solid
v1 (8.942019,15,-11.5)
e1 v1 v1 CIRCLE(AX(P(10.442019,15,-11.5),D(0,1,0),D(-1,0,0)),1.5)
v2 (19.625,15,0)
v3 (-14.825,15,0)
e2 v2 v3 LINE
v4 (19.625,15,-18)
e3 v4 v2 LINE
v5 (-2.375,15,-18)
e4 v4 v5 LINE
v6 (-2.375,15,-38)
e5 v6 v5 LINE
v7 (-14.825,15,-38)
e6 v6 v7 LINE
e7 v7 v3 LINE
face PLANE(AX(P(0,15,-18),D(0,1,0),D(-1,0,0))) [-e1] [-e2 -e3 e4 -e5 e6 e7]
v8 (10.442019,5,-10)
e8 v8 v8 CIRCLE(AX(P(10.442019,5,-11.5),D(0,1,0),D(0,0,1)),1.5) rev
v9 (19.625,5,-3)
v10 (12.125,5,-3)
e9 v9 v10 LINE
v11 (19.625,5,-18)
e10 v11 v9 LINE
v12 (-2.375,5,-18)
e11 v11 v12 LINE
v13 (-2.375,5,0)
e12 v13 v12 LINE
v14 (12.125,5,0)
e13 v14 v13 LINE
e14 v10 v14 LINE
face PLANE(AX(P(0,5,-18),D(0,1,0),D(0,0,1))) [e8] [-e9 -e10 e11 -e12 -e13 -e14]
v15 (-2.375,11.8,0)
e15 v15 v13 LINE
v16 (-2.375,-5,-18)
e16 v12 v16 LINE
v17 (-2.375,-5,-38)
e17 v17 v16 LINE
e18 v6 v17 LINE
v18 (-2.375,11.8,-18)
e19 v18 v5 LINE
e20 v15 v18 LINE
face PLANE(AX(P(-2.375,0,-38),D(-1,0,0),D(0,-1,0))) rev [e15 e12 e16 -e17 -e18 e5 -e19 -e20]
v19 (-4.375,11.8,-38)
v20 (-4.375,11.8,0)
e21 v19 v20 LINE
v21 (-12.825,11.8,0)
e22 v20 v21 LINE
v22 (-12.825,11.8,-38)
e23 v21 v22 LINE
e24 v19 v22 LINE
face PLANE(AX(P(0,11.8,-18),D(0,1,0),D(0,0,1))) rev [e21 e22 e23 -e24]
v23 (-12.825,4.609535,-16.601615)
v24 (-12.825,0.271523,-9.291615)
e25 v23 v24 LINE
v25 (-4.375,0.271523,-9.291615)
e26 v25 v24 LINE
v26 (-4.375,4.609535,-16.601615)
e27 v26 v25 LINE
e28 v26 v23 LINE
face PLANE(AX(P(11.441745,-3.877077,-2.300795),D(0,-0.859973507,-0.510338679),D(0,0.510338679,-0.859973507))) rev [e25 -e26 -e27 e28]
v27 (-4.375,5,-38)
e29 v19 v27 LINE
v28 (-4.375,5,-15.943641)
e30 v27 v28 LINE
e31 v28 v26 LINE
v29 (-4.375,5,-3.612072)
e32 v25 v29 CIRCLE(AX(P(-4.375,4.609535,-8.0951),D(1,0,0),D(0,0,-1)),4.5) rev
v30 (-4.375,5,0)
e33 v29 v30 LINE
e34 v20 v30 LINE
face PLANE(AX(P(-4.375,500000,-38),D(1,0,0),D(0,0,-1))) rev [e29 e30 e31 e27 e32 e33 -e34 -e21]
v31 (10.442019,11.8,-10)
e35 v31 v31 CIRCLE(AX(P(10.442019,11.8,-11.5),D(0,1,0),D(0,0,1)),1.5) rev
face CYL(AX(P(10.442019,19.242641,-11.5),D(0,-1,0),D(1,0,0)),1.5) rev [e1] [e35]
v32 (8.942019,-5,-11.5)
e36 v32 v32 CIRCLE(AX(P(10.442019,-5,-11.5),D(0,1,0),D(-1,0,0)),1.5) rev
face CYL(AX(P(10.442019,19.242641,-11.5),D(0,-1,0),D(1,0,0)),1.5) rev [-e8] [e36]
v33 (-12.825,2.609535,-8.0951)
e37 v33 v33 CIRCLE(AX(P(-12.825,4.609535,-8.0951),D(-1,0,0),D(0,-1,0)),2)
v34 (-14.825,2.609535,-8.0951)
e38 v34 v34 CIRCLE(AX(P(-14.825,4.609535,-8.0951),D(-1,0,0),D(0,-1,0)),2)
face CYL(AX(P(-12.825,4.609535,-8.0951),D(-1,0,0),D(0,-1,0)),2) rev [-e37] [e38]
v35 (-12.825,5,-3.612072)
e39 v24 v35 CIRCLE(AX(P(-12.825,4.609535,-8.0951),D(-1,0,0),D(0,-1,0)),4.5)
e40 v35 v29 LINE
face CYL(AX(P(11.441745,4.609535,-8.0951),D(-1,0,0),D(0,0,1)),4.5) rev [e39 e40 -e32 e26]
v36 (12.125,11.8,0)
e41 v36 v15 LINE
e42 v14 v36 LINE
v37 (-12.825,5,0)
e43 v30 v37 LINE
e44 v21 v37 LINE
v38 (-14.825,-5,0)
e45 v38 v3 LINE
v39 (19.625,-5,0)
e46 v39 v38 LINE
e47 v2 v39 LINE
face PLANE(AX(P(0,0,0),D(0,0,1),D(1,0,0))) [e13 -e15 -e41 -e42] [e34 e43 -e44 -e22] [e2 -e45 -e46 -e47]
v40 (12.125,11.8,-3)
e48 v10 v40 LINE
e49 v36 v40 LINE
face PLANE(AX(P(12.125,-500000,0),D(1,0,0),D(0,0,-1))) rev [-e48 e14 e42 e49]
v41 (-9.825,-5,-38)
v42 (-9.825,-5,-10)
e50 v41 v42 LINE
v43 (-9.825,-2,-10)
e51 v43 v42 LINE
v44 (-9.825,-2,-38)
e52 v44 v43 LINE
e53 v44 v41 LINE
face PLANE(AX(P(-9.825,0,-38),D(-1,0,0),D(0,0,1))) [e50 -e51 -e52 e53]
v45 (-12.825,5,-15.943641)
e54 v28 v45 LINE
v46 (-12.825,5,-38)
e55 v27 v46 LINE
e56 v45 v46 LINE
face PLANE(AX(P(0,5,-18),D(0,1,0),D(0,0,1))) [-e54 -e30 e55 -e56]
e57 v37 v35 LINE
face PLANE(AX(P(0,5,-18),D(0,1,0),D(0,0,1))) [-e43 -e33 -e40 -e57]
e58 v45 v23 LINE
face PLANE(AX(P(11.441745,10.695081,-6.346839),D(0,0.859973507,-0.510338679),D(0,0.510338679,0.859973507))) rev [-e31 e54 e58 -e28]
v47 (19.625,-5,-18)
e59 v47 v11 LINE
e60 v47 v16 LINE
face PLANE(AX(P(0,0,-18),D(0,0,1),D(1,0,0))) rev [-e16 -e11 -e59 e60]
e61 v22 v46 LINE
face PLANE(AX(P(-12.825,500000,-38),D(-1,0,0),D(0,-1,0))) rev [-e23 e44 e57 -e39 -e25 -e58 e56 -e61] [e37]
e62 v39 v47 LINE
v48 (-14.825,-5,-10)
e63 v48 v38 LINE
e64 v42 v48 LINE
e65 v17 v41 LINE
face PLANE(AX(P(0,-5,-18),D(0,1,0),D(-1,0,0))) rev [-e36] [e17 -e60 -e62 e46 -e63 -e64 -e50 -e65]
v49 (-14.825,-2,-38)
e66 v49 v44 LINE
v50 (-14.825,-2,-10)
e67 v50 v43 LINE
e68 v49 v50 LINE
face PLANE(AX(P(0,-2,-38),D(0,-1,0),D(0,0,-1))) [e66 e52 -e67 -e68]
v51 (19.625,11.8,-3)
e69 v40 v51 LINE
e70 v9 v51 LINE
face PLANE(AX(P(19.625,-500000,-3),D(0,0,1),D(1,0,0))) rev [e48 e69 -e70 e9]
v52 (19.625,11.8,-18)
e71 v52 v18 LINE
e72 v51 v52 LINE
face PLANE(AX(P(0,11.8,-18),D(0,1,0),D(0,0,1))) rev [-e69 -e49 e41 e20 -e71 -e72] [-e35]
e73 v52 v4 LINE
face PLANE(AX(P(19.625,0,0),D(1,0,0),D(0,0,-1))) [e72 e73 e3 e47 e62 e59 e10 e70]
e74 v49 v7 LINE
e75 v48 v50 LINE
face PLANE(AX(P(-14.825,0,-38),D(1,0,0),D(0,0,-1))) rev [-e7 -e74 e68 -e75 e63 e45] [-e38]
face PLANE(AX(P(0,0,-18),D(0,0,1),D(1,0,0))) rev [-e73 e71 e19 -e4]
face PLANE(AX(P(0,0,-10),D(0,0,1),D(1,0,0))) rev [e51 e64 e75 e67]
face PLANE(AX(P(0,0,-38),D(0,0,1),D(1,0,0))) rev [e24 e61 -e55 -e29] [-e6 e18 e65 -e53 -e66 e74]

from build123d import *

# Parameters (mm, degrees)
SKETCH1_W             = 19
SKETCH1_H             = 10
BOSS_EXTRUDE1_DEPTH   = 18
SKETCH1_H_2           = 3.2
BOSS_EXTRUDE1_2_DEPTH = 18
SKETCH1_6_W           = 12.45
SKETCH1_6_H           = 3.2
BOSS_EXTRUDE6_DEPTH   = 38
BOSS_EXTRUDE7_DEPTH   = 10
SKETCH4_W             = 18
SKETCH4_H             = 10
SKETCH4_H_2           = 3.2
BOSS_EXTRUDE8_DEPTH   = 3
CUT_EXTRUDE1_START    = -10
SKETCH6_R             = 1.5
CUT_EXTRUDE1_DEPTH    = 20
BOSS_EXTRUDE10_REACH  = 45.922
SKETCH7_W             = 2
SKETCH7_H             = 38
BOSS_EXTRUDE11_REACH  = 47.95
SKETCH8_W             = 7.5
SKETCH8_H             = 3
SKETCH9_R             = 2
CUT_EXTRUDE2_DEPTH    = 2
CUT_EXTRUDE3_START    = -10.45
CUT_EXTRUDE3_DEPTH    = 8.45


# Read off the part's stored shape, not the designer's step: Cut-Extrude3
with BuildPart() as part:
    # Sketch1 → Boss-Extrude1 (new body)
    with BuildSketch(Plane.XY):
        with Locations((7.125, 0)):
            Rectangle(SKETCH1_W, SKETCH1_H)
    extrude(amount=-BOSS_EXTRUDE1_DEPTH)



with BuildPart() as body_2:
    # Sketch1 → Boss-Extrude1 2 (new body)
    with BuildSketch(Plane.XY):
        with Locations((7.125, 13.4)):
            Rectangle(SKETCH1_W, SKETCH1_H_2)
    extrude(amount=-BOSS_EXTRUDE1_2_DEPTH)


with BuildPart() as part_1:
    add(part.part)

    add(body_2.part)  # Boss-Extrude6 merges body 2
    # Sketch1<6> → Boss-Extrude6 (add)
    with BuildSketch(Plane.XY):
        Polygon((-14.825, 5), (-14.825, -2), (-9.825, -2), (-9.825, -5), (-2.375, -5), (-2.375, 5), align=None)
        with Locations((-8.6, 13.4)):
            Rectangle(SKETCH1_6_W, SKETCH1_6_H)
    extrude(amount=-BOSS_EXTRUDE6_DEPTH)

    # Sketch1<7> → Boss-Extrude7 (add)
    with BuildSketch(Plane.XY):
        Polygon((-14.825, -2), (-14.825, -3.3), (-14.825, -5), (-9.825, -5), (-9.825, -2), align=None)
    extrude(amount=-BOSS_EXTRUDE7_DEPTH)

    # Sketch4 → Boss-Extrude8 (add)
    with BuildSketch(Plane(origin=(16.625, 0, 0), x_dir=(0, 0, -1), z_dir=(1, 0, 0))):
        with Locations((9, 0)):
            Rectangle(SKETCH4_W, SKETCH4_H)
        with Locations((9, 13.4)):
            Rectangle(SKETCH4_W, SKETCH4_H_2)
    extrude(amount=BOSS_EXTRUDE8_DEPTH)

    # Sketch6 → Cut-Extrude1 (cut)
    with BuildSketch(Plane(origin=(0, 5, 0), x_dir=(1, 0, 0), z_dir=(0, 1, 0)).offset(CUT_EXTRUDE1_START)):
        with Locations(Location((10.44201924, 11.5, 0), (0, 0, 270))):
            Circle(SKETCH6_R)
    extrude(amount=CUT_EXTRUDE1_DEPTH, mode=Mode.SUBTRACT)

    # Sketch7 → Boss-Extrude10 (add, up to next)
    with BuildSketch(Plane(origin=(0, 5, 0), x_dir=(1, 0, 0), z_dir=(0, 1, 0)), mode=Mode.PRIVATE) as boss_extrude10_sk1:
        with Locations((-3.375, 19)):
            Rectangle(SKETCH7_W, SKETCH7_H)
    boss_extrude10_tool1 = extrude(boss_extrude10_sk1.sketch, amount=BOSS_EXTRUDE10_REACH, mode=Mode.PRIVATE) - part_1.part
    # Sketch7 → Boss-Extrude10 (add, up to next)
    with BuildSketch(Plane(origin=(0, 5, 0), x_dir=(1, 0, 0), z_dir=(0, 1, 0)), mode=Mode.PRIVATE) as boss_extrude10_sk2:
        with Locations((-13.825, 19)):
            Rectangle(SKETCH7_W, SKETCH7_H)
    boss_extrude10_tool2 = extrude(boss_extrude10_sk2.sketch, amount=BOSS_EXTRUDE10_REACH, mode=Mode.PRIVATE) - part_1.part
    add(boss_extrude10_tool1.solids().sort_by_distance((-3.375, 5, -19))[0])
    add(boss_extrude10_tool2.solids().sort_by_distance((-13.825, 5, -19))[0])

    # Sketch8 → Boss-Extrude11 (add, up to next)
    with BuildSketch(Plane.XZ.offset(-11.8), mode=Mode.PRIVATE) as boss_extrude11_sk1:
        with Locations((15.875, -1.5)):
            Rectangle(SKETCH8_W, SKETCH8_H)
    boss_extrude11_tool1 = extrude(boss_extrude11_sk1.sketch, amount=BOSS_EXTRUDE11_REACH, mode=Mode.PRIVATE) - part_1.part
    add(boss_extrude11_tool1.solids().sort_by_distance((15.875, 11.8, -1.5))[0])

    # Sketch9 → Cut-Extrude2 (cut)
    with BuildSketch(Plane.ZY.offset(14.825)):
        with Locations(Location((-8.095100141, 4.609535031, 0), (0, 0, 270))):
            Circle(SKETCH9_R)
    extrude(amount=-CUT_EXTRUDE2_DEPTH, mode=Mode.SUBTRACT)

    # Cut-Extrude3 outline → Cut-Extrude3 (cut)
    with BuildSketch(Plane.ZY.offset(14.825).offset(CUT_EXTRUDE3_START)):
        with BuildLine():
            Line((-3.612072469, 5), (-15.943641317, 5))
            Line((-15.943641317, 5), (-16.601615213, 4.609535031))
            Line((-16.601615213, 4.609535031), (-9.291615213, 0.271522619))
            ThreePointArc((-9.291615213, 0.271522619), (-5.215878744, 1.151199572), (-3.612072469, 5))
        make_face()
    extrude(amount=CUT_EXTRUDE3_DEPTH, mode=Mode.SUBTRACT)


solid = part_1.part
